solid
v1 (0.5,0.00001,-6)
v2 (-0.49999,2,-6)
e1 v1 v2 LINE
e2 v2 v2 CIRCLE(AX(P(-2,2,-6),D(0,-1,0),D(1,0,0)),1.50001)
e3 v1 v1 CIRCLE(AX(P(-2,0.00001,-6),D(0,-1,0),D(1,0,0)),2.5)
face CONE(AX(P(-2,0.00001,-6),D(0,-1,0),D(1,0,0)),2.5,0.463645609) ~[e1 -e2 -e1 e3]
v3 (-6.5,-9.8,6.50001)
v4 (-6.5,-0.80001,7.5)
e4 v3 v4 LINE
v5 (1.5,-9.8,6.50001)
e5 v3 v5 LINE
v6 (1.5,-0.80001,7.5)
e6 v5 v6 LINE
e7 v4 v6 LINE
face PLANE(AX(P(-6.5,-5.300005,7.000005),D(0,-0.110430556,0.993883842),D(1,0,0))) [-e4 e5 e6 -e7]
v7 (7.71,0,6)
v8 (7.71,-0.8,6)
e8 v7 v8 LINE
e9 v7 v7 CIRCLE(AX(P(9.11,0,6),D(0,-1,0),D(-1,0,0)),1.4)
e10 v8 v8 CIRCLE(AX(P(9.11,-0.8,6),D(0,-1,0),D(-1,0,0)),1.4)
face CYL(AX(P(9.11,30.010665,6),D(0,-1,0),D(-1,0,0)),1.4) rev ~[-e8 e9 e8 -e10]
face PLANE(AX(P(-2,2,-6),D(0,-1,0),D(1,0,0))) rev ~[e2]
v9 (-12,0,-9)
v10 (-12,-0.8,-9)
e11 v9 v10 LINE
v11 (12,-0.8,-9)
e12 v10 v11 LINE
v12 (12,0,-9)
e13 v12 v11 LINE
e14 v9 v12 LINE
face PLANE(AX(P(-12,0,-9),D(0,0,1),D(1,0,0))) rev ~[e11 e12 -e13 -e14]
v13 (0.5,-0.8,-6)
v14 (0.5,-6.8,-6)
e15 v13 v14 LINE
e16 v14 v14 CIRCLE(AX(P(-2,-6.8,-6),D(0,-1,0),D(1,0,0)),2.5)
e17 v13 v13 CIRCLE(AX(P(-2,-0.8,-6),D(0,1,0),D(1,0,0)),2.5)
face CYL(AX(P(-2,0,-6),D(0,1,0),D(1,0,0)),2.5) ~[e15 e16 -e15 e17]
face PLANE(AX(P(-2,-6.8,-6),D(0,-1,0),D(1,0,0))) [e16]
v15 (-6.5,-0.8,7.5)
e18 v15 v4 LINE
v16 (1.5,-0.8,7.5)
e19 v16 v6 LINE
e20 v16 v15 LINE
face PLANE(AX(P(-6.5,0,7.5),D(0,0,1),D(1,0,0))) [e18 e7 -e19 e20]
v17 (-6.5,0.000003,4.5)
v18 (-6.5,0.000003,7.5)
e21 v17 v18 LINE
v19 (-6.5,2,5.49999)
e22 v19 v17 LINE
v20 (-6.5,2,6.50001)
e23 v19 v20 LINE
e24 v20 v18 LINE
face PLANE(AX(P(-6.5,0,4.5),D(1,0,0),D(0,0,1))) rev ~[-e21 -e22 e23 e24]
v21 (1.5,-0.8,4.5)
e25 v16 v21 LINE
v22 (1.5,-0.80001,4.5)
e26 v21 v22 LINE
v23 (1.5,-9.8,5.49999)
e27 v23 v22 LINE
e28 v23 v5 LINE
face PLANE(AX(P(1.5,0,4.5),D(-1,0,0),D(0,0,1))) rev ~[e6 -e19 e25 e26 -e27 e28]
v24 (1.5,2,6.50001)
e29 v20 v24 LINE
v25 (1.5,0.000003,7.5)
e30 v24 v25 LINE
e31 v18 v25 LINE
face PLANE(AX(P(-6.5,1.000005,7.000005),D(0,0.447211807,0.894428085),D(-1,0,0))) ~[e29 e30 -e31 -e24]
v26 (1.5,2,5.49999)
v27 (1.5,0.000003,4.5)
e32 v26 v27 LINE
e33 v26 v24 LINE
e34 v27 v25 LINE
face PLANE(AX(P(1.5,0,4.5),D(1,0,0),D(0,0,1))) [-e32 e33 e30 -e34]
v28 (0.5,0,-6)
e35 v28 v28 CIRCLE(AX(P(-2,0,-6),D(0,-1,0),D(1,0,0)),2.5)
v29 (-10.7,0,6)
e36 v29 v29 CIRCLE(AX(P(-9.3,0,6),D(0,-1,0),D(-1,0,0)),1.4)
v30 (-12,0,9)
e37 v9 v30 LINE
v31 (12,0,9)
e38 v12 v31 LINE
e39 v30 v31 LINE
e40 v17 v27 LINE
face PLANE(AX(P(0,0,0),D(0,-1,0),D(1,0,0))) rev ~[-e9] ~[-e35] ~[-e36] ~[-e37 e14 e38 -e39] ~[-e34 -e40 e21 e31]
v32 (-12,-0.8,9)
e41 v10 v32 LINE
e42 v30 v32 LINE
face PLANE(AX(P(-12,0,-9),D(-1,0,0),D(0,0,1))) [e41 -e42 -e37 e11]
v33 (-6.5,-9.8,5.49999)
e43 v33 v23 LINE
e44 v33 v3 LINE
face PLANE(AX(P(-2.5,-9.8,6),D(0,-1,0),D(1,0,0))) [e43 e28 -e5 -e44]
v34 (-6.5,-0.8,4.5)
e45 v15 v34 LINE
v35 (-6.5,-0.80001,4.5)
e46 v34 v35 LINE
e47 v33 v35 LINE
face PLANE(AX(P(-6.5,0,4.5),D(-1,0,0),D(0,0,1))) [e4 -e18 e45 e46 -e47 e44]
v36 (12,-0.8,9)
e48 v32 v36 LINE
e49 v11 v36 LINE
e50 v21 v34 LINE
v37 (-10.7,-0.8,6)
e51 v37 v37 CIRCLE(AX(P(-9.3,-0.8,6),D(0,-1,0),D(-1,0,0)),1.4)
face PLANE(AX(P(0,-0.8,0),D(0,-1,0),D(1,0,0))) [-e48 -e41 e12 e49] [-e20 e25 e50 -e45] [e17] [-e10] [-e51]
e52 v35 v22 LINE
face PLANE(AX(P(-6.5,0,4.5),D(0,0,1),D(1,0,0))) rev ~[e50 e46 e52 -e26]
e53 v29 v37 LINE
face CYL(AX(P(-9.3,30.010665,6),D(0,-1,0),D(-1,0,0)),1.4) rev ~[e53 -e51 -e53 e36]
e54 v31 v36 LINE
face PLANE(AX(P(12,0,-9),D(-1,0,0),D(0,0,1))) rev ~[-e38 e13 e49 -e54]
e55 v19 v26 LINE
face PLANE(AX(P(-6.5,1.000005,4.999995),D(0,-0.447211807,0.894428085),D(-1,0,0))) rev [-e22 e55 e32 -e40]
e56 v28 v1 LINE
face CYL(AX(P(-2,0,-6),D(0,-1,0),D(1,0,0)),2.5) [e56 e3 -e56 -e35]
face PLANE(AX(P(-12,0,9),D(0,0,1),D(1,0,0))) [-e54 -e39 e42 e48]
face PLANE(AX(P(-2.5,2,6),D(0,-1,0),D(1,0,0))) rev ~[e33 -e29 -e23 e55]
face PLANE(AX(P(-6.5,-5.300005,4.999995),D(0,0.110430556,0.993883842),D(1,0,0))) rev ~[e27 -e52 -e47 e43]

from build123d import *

# Parameters (mm, degrees)
F0_W     = 24
F0_H     = 18
F0_R     = 2.5
F0_W_2   = 8
F0_H_2   = 3
F1_DEPTH = 0.8
F2_D     = 2.8
F3_DEPTH = 2
F4_SIZE2 = 1.99999
F4_SIZE  = 0.99999
F5_SIZE2 = 0.99999
F5_SIZE  = 1.99999
F6_DEPTH = 6.8
F7_DEPTH = 9.8
F8_SIZE2 = 8.99999
F8_SIZE  = 0.99999


# Not quite as in the source:
# - a fillet or chamfer is up to 0.001 mm smaller than in the source, because OpenCascade refuses the exact size


with BuildPart() as f1:
    # F0 (on Front) → F1 (new body)
    with BuildSketch(Plane.XZ):
        Rectangle(F0_W, F0_H)
        with Locations((-2, -6)):
            Circle(F0_R, mode=Mode.SUBTRACT)
        with Locations((-2.5, 6)):
            Rectangle(F0_W_2, F0_H_2, mode=Mode.SUBTRACT)
        with Locations((-2.5, 6)):
            Rectangle(F0_W_2, F0_H_2)
        with Locations((-2, -6)):
            Circle(F0_R)
    extrude(amount=F1_DEPTH)

    # F2 (through all)
    with Locations(Plane(origin=(0, 0, 0), x_dir=(1, 0, 0), z_dir=(0, 1, 0))):
        with Locations((-9.3, -6), (9.11, -6)):
            Hole(F2_D / 2)

    # F0 (on Front) → F3 (join)
    with BuildSketch(Plane.XZ):
        with Locations((-2.5, 6)):
            Rectangle(F0_W_2, F0_H_2)
        with Locations((-2, -6)):
            Circle(F0_R)
    extrude(amount=-F3_DEPTH)

    # F4 (size 1 and 2 in the source; OpenCascade refuses exactly that, so slightly less here)
    f4_edges = [f1.edges().sort_by_distance(p)[0] for p in [
        (-2.5, 2, 4.5),
        (-2.5, 2, 7.5),
    ]]
    f4_side = f1.faces().sort_by_distance((-2.5, 2, 6))[0]
    chamfer(f4_edges, length=F4_SIZE, length2=F4_SIZE2, reference=f4_side)

    # F5 (size 2 and 1 in the source; OpenCascade refuses exactly that, so slightly less here)
    f5_edges = [f1.edges().sort_by_distance(p)[0] for p in [
        (-4.5, 2, -6),
    ]]
    f5_side = f1.faces().sort_by_distance((-4.5, 1, -6))[0]
    chamfer(f5_edges, length=F5_SIZE, length2=F5_SIZE2, reference=f5_side)

    # F0 (on Front) → F6 (join)
    with BuildSketch(Plane.XZ):
        with Locations((-2, -6)):
            Circle(F0_R)
    extrude(amount=F6_DEPTH)

    # F0 (on Front) → F7 (join)
    with BuildSketch(Plane.XZ):
        with Locations((-2.5, 6)):
            Rectangle(F0_W_2, F0_H_2)
    extrude(amount=F7_DEPTH)

    # F8 (size 1 and 9 in the source; OpenCascade refuses exactly that, so slightly less here)
    f8_edges = [f1.edges().sort_by_distance(p)[0] for p in [
        (-2.5, -9.8, 7.5),
        (-2.5, -9.8, 4.5),
    ]]
    f8_side = f1.faces().sort_by_distance((-2.5, -9.8, 6))[0]
    chamfer(f8_edges, length=F8_SIZE, length2=F8_SIZE2, reference=f8_side)


solid = f1.part
